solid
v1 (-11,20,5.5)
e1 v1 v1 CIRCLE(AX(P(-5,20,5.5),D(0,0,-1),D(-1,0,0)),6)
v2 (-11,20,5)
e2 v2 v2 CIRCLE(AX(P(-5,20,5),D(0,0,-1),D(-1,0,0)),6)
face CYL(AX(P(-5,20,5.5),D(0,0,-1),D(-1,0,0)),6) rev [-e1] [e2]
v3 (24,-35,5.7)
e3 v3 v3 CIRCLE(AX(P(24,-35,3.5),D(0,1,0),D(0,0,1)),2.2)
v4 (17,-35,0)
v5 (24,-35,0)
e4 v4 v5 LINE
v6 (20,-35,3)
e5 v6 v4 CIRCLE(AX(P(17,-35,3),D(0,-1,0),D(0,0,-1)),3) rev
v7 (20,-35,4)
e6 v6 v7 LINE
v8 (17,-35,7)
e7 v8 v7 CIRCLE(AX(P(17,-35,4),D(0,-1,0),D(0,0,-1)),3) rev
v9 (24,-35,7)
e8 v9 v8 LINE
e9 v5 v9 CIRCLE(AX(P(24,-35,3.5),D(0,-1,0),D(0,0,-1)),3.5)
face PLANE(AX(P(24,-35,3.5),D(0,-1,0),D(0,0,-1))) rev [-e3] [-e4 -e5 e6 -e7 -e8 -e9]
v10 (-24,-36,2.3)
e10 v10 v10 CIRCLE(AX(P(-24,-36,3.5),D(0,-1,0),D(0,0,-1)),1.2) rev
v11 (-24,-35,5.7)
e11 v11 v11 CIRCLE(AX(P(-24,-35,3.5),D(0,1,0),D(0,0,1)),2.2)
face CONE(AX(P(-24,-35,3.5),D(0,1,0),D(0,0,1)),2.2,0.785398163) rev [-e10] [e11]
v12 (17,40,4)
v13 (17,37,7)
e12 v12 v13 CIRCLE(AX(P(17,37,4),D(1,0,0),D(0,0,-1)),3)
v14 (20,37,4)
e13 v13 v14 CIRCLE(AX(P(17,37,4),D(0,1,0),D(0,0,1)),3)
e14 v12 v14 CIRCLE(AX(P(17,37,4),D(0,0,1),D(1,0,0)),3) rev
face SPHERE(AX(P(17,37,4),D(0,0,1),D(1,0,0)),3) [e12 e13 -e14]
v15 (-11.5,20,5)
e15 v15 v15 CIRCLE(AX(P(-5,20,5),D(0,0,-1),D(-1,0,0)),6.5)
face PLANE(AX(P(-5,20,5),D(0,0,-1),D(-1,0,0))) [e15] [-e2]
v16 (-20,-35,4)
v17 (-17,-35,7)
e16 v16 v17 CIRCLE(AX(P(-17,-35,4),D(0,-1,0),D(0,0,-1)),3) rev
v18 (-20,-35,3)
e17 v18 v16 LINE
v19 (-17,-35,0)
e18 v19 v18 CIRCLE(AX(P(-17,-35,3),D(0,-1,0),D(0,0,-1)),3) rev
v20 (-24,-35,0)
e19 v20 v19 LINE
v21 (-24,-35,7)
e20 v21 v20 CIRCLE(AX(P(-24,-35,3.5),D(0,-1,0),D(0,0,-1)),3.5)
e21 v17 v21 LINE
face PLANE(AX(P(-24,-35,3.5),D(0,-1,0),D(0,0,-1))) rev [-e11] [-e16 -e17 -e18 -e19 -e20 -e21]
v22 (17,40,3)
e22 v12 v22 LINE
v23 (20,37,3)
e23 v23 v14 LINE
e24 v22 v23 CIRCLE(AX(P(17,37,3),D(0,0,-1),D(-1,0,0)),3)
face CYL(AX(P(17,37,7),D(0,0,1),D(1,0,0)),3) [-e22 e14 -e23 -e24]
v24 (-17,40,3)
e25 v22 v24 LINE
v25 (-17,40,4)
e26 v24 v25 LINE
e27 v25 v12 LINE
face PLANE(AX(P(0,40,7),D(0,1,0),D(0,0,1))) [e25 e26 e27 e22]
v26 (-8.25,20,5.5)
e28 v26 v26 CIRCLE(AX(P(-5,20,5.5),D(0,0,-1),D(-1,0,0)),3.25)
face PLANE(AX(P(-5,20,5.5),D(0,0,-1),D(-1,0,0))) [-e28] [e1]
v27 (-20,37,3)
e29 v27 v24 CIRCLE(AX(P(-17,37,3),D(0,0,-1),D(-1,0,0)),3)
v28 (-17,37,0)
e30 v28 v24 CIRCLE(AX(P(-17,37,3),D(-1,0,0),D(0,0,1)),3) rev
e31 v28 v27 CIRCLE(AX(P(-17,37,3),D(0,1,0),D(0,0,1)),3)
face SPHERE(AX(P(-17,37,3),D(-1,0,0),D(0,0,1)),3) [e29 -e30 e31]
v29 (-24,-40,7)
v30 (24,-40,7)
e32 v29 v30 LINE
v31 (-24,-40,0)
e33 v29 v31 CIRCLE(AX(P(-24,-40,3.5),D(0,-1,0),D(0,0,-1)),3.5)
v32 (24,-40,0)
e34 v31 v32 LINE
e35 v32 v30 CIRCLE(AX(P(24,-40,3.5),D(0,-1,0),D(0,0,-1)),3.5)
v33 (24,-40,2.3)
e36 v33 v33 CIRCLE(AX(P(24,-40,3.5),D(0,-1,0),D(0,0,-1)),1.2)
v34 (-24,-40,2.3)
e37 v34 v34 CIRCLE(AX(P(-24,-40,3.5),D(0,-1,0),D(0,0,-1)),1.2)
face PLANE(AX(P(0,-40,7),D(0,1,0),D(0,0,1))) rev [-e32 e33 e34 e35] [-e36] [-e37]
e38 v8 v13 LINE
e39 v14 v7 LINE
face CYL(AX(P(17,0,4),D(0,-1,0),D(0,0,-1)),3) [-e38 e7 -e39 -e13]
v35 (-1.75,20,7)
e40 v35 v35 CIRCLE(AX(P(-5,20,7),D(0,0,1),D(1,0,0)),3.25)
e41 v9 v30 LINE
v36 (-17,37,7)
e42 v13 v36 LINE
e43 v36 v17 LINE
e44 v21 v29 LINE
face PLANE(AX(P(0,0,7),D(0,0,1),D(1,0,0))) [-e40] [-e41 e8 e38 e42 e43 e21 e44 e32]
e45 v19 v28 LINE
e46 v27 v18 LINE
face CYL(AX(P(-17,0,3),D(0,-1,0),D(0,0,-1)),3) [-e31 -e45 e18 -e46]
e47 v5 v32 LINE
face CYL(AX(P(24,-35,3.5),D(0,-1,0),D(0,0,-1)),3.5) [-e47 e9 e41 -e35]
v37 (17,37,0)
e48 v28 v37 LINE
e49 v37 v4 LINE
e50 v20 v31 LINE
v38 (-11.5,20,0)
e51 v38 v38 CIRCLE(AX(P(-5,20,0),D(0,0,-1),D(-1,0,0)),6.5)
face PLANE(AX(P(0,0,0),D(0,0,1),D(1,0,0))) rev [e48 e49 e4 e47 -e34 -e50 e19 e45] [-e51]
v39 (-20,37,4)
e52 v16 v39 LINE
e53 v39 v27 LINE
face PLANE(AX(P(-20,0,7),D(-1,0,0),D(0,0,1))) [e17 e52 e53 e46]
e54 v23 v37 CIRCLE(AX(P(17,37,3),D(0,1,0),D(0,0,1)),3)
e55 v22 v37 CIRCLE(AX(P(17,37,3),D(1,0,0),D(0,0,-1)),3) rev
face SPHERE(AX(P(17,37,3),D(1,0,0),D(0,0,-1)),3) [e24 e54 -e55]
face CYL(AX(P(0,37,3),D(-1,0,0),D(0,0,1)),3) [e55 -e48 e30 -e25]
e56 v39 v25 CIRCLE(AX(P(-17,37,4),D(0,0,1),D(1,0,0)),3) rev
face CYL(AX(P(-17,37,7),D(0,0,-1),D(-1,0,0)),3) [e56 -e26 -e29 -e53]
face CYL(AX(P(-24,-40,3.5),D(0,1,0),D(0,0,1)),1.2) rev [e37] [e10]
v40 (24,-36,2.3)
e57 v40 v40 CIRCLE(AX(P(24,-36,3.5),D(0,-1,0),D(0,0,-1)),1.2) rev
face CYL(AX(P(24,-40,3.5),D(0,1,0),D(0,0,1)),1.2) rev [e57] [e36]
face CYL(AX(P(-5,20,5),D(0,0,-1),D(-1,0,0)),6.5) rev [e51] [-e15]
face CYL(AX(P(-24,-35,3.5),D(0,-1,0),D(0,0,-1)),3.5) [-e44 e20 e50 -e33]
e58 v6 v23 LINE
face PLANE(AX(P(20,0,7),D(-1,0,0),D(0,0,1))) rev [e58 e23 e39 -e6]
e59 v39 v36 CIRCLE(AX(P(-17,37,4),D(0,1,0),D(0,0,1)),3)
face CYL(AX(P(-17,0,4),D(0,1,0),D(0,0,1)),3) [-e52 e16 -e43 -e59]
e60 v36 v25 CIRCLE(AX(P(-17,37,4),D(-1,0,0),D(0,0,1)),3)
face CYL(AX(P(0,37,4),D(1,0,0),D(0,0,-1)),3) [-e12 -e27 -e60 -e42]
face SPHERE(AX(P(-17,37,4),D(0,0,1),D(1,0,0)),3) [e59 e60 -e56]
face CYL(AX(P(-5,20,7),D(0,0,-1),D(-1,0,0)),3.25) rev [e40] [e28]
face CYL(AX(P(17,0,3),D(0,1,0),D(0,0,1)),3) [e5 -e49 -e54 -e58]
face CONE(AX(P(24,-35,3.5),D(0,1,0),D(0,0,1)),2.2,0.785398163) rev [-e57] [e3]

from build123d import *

# Parameters (mm, degrees)
CROQUIS1_W                   = 40
CROQUIS1_H                   = 80
CROQUIS1_R                   = 3.25
SALIENTE_EXTRUIR1_DEPTH      = 7
CROQUIS2_R                   = 6.5
CORTAR_EXTRUIR1_DEPTH        = 5
CROQUIS3_R                   = 6
CORTAR_EXTRUIR2_DEPTH        = 0.5
REDONDEO2_R                  = 3
SALIENTE_EXTRUIR2_DEPTH      = 5
TALADROAVANZADO1_OUTLINE_R   = 1.2
TALADROAVANZADO1_DEPTH       = 1
TALADROAVANZADO1_DRAFT       = -45
TALADROAVANZADO1_2_OUTLINE_R = 1.2
TALADROAVANZADO1_2_DEPTH     = 1
TALADROAVANZADO1_2_DRAFT     = -45
CORTAR_EXTRUIR3_START        = 1
CROQUIS8_R                   = 1.2
CORTAR_EXTRUIR3_DEPTH        = 83.124903698


# Read off the part's stored shape, not the designer's step: TaladroAvanzado1
with BuildPart() as part:
    # Croquis1 → Saliente-Extruir1 (new body)
    with BuildSketch(Plane.XY):
        Rectangle(CROQUIS1_W, CROQUIS1_H)
        with Locations((-5, 20)):
            Circle(CROQUIS1_R, mode=Mode.SUBTRACT)
    extrude(amount=SALIENTE_EXTRUIR1_DEPTH)

    # Croquis2 → Cortar-Extruir1 (cut)
    with BuildSketch(Plane(origin=(0, 0, 0), x_dir=(-1, 0, 0), z_dir=(0, 0, -1))):
        with Locations((5, 20)):
            Circle(CROQUIS2_R)
    extrude(amount=-CORTAR_EXTRUIR1_DEPTH, mode=Mode.SUBTRACT)

    # Croquis3 → Cortar-Extruir2 (cut)
    with BuildSketch(Plane(origin=(0, 0, 5), x_dir=(-1, 0, 0), z_dir=(0, 0, -1))):
        with Locations((5, 20)):
            Circle(CROQUIS3_R)
    extrude(amount=-CORTAR_EXTRUIR2_DEPTH, mode=Mode.SUBTRACT)

    # Redondeo2
    redondeo2_edges = [part.edges().sort_by_distance(p)[0] for p in [
        (-20, 40, 3.5),
        (20, 40, 3.5),
        (20, 0, 7),
        (0, 40, 7),
        (-20, 0, 7),
        (-20, 0, 0),
        (0, 40, 0),
        (20, 0, 0),
    ]]
    fillet(redondeo2_edges, radius=REDONDEO2_R)

    # Croquis4 → Saliente-Extruir2 (add)
    with BuildSketch(Plane.XZ.offset(40)):
        with BuildLine():
            Line((-17, 7), (-24, 7))
            ThreePointArc((-24, 7), (-27.5, 3.5), (-24, 0))
            Line((-24, 0), (-17, 0))
            Line((-17, 0), (-17, 7))
        make_face()
        with BuildLine():
            Line((17, 7), (24, 7))
            ThreePointArc((24, 7), (27.5, 3.5), (24, 0))
            Line((24, 0), (17, 0))
            Line((17, 0), (17, 7))
        make_face()
    extrude(amount=-SALIENTE_EXTRUIR2_DEPTH)


with BuildPart() as taladroavanzado1_tool:
    # TaladroAvanzado1 outline → TaladroAvanzado1 (with draft: the straight prism first)
    with BuildSketch(Plane(origin=(0, -36, 0), x_dir=(1, 0, 0), z_dir=(0, 1, 0))):
        with Locations((24, -3.5)):
            Circle(TALADROAVANZADO1_OUTLINE_R)
    extrude(amount=TALADROAVANZADO1_DEPTH)
    # TaladroAvanzado1: the draft: its side faces are tilted about the plane it starts from
    taladroavanzado1_sides = [taladroavanzado1_tool.faces().sort_by_distance(p)[0] for p in [
        (22.8, -35.5, 3.5),
    ]]
    draft(taladroavanzado1_sides, Plane(origin=(0, -36, 0), x_dir=(1, 0, 0), z_dir=(0, 1, 0)), TALADROAVANZADO1_DRAFT)


with BuildPart() as part_1:
    add(part.part)

    # TaladroAvanzado1: cut by taladroavanzado1_tool
    add(taladroavanzado1_tool.part, mode=Mode.SUBTRACT)


with BuildPart() as taladroavanzado1_2_tool:
    # TaladroAvanzado1 2 outline → TaladroAvanzado1 2 (with draft: the straight prism first)
    with BuildSketch(Plane(origin=(0, -36, 0), x_dir=(1, 0, 0), z_dir=(0, 1, 0))):
        with Locations((-24, -3.5)):
            Circle(TALADROAVANZADO1_2_OUTLINE_R)
    extrude(amount=TALADROAVANZADO1_2_DEPTH)
    # TaladroAvanzado1 2: the draft: its side faces are tilted about the plane it starts from
    taladroavanzado1_2_sides = [taladroavanzado1_2_tool.faces().sort_by_distance(p)[0] for p in [
        (-25.2, -35.5, 3.5),
    ]]
    draft(taladroavanzado1_2_sides, Plane(origin=(0, -36, 0), x_dir=(1, 0, 0), z_dir=(0, 1, 0)), TALADROAVANZADO1_2_DRAFT)


with BuildPart() as part_2:
    add(part_1.part)

    # TaladroAvanzado1 2: cut by taladroavanzado1_2_tool
    add(taladroavanzado1_2_tool.part, mode=Mode.SUBTRACT)

    # Croquis8 → Cortar-Extruir3 (cut, through all)
    with BuildSketch(Plane(origin=(0, -36, 0), x_dir=(1, 0, 0), z_dir=(0, 1, 0)).offset(CORTAR_EXTRUIR3_START)):
        with Locations(Location((24, -3.5, 0), (0, 0, 90))):
            Circle(CROQUIS8_R)
        with Locations(Location((-24, -3.5, 0), (0, 0, 90))):
            Circle(CROQUIS8_R)
    extrude(amount=-CORTAR_EXTRUIR3_DEPTH, mode=Mode.SUBTRACT)


solid = part_2.part
